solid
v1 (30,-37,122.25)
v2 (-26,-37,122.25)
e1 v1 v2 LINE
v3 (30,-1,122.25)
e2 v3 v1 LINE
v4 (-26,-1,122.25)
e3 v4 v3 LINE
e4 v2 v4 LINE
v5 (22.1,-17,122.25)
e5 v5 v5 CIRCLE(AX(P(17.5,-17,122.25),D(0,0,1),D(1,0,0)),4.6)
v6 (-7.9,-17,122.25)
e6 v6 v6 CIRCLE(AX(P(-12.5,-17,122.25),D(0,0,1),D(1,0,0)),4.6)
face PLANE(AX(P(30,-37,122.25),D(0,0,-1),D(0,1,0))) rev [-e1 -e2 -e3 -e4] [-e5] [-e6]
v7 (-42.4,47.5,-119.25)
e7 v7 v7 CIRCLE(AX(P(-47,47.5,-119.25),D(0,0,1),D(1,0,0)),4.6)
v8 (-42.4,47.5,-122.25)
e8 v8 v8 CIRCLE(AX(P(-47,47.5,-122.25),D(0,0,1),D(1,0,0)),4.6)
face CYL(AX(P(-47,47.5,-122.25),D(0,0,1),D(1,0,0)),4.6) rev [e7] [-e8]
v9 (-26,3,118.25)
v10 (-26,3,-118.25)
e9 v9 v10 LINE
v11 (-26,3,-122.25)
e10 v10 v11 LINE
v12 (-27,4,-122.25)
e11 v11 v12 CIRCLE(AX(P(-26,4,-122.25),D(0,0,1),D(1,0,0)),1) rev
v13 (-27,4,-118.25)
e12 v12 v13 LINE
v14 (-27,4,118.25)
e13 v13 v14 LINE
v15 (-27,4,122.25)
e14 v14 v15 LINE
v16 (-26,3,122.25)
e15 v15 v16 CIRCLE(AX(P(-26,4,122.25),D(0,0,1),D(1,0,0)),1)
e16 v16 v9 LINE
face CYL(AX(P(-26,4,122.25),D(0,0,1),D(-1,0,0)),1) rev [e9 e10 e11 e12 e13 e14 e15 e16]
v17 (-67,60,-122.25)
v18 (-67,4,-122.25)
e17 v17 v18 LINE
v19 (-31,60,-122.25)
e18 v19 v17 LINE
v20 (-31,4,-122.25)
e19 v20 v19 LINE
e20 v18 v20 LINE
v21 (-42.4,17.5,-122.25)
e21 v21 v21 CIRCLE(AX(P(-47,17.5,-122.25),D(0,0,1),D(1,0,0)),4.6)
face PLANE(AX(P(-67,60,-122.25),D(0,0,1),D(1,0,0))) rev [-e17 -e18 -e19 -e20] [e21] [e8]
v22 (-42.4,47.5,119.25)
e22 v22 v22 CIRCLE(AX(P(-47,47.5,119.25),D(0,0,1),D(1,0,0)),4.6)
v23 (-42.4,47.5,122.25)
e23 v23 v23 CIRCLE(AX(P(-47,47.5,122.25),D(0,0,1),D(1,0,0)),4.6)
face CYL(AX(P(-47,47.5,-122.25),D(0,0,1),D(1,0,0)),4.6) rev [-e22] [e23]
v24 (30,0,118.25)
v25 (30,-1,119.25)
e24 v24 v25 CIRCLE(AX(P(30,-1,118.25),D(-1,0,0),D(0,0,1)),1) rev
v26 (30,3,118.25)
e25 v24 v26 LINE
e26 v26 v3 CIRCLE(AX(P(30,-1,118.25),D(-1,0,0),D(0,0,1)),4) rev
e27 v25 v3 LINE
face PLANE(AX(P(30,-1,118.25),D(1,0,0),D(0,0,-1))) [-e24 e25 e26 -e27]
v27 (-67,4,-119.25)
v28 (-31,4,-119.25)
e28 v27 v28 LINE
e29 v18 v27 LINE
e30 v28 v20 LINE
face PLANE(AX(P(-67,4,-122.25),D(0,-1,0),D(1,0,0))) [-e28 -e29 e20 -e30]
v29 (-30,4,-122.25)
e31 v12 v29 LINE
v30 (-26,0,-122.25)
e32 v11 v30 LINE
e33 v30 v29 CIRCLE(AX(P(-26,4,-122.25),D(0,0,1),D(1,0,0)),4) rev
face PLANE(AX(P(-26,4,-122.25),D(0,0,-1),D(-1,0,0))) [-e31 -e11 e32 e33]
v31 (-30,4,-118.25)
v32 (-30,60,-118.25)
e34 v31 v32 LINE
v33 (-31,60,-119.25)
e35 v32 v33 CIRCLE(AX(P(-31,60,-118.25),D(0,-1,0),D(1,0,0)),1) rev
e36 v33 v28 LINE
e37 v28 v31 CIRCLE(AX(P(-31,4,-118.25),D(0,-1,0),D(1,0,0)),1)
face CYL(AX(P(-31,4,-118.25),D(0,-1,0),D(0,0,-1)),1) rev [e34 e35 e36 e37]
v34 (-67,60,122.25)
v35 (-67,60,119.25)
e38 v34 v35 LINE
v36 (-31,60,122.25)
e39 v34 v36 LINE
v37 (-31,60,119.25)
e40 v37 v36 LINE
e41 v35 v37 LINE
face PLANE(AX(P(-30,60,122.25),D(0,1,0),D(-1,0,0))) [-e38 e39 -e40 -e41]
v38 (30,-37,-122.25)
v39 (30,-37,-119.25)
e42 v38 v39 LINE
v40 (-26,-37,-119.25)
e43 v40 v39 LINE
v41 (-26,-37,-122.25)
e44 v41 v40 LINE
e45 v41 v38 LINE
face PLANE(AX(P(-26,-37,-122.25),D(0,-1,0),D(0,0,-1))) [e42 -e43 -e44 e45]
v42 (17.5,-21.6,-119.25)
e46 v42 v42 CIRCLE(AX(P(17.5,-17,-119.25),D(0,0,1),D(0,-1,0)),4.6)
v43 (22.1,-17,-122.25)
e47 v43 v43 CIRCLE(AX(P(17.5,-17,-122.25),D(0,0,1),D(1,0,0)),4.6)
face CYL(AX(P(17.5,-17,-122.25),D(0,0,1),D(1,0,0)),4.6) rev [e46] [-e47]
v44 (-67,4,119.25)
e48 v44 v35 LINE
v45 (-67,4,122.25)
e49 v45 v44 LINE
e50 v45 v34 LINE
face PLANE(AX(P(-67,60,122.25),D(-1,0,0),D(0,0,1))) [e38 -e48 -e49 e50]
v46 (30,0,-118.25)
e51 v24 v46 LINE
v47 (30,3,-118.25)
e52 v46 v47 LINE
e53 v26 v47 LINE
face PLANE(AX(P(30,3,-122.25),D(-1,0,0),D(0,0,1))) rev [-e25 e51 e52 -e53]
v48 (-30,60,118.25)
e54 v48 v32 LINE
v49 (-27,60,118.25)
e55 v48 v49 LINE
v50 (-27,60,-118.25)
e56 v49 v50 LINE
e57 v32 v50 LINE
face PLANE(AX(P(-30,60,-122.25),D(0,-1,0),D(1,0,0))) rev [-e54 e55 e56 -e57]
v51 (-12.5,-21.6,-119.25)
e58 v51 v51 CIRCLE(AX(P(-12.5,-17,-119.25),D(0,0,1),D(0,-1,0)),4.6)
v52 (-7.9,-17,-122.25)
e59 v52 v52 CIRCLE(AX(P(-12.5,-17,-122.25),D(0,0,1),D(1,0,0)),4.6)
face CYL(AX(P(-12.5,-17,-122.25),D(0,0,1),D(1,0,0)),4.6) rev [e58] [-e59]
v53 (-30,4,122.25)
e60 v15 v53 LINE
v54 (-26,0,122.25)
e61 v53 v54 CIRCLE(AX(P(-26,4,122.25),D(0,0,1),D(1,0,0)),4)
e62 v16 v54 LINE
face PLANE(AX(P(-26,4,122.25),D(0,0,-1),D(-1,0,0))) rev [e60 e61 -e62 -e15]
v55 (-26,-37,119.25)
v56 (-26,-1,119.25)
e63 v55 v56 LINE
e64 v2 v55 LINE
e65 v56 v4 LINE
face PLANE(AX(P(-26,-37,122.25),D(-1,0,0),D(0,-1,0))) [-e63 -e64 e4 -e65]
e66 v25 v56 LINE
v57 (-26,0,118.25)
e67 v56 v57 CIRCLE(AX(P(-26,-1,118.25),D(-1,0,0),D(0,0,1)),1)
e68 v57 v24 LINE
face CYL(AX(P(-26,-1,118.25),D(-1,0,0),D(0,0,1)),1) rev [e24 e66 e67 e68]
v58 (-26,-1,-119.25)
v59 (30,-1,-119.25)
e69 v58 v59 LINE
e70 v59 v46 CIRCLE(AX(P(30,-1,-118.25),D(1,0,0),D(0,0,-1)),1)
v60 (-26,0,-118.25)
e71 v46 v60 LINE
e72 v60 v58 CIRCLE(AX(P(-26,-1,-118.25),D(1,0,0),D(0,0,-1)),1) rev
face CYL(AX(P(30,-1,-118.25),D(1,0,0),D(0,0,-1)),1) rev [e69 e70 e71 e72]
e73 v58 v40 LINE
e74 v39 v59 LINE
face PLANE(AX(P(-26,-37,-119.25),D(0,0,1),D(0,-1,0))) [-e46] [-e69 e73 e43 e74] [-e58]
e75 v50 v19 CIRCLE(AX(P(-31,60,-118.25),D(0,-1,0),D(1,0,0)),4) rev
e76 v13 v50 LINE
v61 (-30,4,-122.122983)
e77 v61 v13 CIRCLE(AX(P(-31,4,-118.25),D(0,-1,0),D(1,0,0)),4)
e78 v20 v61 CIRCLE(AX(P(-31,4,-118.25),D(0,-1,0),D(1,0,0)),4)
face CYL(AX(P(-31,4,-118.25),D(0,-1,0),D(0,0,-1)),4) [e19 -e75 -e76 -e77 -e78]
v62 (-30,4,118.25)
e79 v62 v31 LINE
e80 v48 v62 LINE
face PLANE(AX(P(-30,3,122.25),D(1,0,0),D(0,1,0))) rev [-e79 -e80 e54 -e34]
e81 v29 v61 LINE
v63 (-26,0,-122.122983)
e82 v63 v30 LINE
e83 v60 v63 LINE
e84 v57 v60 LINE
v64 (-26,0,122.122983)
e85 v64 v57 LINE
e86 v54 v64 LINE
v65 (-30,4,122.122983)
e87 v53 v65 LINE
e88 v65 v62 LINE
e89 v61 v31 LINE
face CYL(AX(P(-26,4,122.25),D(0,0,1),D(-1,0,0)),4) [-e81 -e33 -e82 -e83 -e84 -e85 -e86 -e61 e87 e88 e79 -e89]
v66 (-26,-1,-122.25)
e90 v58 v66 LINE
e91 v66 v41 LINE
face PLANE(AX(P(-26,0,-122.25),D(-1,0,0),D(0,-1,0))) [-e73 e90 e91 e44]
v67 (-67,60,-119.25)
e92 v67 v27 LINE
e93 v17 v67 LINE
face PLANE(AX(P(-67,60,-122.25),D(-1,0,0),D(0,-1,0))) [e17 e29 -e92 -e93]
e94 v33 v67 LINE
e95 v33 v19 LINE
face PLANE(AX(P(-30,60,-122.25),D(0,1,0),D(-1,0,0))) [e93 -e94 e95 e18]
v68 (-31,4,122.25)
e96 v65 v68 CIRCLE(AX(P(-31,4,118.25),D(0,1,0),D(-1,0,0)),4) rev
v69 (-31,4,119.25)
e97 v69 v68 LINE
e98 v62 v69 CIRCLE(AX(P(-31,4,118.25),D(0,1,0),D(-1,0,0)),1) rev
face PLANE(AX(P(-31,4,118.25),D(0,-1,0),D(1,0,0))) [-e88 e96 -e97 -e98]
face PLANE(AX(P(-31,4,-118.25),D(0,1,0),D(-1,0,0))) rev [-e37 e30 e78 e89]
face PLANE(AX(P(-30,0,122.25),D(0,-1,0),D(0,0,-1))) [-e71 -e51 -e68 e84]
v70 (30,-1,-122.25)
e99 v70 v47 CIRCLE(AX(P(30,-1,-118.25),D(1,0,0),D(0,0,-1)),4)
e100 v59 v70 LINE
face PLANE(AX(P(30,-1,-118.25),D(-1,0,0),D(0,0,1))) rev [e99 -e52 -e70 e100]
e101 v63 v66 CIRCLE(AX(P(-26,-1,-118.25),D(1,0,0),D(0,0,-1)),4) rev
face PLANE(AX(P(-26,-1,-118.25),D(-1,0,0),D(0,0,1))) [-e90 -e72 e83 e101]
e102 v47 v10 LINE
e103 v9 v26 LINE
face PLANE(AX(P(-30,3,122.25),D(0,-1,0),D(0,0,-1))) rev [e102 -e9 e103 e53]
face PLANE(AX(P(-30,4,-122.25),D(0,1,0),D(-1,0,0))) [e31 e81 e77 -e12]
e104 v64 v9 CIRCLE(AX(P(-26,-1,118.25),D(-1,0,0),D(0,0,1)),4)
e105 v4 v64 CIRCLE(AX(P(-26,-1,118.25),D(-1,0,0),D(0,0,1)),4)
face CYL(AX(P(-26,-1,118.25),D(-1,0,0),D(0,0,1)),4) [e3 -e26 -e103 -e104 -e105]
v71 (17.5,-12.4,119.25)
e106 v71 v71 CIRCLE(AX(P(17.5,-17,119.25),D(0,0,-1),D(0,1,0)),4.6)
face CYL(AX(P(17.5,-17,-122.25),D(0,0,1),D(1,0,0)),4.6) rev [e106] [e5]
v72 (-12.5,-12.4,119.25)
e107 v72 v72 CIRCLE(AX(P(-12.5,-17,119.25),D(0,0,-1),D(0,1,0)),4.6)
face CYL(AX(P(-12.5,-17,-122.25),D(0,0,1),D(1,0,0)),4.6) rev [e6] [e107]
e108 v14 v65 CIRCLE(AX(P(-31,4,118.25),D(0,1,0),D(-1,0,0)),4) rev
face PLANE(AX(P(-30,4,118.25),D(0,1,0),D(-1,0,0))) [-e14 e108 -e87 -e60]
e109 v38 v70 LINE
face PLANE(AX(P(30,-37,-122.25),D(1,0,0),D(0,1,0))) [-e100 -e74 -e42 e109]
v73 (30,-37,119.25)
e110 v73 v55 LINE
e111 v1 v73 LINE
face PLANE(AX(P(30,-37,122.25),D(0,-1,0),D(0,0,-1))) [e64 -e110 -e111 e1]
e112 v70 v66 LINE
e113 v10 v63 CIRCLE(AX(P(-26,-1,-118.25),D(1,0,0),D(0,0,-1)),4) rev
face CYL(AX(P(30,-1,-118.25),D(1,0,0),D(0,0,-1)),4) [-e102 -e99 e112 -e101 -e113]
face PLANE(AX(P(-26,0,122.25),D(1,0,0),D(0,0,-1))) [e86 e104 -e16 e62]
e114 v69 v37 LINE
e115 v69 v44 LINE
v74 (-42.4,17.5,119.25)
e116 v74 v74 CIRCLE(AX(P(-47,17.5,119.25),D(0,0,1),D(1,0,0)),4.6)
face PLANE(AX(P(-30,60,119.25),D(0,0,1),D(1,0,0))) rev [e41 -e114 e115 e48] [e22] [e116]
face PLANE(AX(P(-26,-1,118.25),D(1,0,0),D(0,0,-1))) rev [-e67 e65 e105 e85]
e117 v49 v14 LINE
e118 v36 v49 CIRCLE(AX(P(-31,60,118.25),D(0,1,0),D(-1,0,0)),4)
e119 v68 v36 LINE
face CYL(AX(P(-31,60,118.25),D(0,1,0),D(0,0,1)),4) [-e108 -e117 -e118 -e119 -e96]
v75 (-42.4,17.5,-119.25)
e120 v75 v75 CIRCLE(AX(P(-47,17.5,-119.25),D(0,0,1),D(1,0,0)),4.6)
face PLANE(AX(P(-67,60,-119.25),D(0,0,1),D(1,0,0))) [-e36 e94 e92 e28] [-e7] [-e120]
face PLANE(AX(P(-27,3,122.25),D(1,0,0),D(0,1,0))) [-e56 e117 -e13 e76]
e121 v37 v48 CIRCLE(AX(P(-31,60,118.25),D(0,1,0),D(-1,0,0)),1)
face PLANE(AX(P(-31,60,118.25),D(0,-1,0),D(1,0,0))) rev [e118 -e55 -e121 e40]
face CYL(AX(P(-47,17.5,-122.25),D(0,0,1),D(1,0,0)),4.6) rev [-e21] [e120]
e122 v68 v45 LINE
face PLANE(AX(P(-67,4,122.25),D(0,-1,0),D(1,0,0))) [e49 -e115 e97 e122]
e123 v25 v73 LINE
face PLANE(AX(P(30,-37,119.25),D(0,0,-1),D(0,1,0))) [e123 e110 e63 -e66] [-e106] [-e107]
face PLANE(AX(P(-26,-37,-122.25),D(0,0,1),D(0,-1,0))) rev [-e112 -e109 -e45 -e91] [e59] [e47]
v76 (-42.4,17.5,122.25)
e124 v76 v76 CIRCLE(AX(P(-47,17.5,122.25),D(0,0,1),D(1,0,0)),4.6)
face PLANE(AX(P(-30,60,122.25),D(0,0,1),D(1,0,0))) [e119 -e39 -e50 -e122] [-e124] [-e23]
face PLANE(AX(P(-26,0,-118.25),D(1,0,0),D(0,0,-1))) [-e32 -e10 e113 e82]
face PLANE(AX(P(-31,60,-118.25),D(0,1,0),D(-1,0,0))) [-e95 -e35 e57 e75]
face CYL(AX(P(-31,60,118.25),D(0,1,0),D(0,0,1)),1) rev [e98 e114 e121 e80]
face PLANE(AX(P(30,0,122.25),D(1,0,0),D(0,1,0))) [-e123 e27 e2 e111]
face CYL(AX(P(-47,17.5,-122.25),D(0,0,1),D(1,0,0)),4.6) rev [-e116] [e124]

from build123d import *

# Parameters (mm, degrees)
SKETCH1_W                      = 60
SKETCH1_H                      = 244.5
BASE_FLANGE1_DEPTH             = 3
EDGE_FLANGE1_STRIP_W           = 14
EDGE_FLANGE1_STRIP_H           = 3
EDGE_FLANGE1_STRIP_CUT_DEPTH   = 244.5
EDGE_FLANGE1_DEPTH             = 244.5
EDGE_FLANGE2_STRIP_W           = 14
EDGE_FLANGE2_STRIP_H           = 3
EDGE_FLANGE2_STRIP_CUT_DEPTH   = 56
EDGE_FLANGE2_STRIP_2_W         = 14
EDGE_FLANGE2_STRIP_2_H         = 3
EDGE_FLANGE2_STRIP_CUT_2_DEPTH = 56
EDGE_FLANGE2_STRIP_3_W         = 14
EDGE_FLANGE2_STRIP_3_H         = 3
EDGE_FLANGE2_STRIP_CUT_3_DEPTH = 56
EDGE_FLANGE2_STRIP_4_W         = 14
EDGE_FLANGE2_STRIP_4_H         = 3
EDGE_FLANGE2_STRIP_CUT_4_DEPTH = 56
EDGE_FLANGE2_DEPTH             = 56
EDGE_FLANGE2_BEND_DEPTH        = 56
EDGE_FLANGE2_BEND_2_DEPTH      = 56
EDGE_FLANGE2_BEND_3_DEPTH      = 56
SKETCH18_R                     = 4.6
EXTRUDE1_DEPTH                 = 261.517273899


# Sheet-metal steps are written as plain solids
with BuildPart() as part:
    # Sketch1 → Base-Flange1 (new body)
    with BuildSketch(Plane(origin=(0, 0, 0), x_dir=(1, 0, 0), z_dir=(0, 1, 0))):
        Rectangle(SKETCH1_W, SKETCH1_H)
    extrude(amount=BASE_FLANGE1_DEPTH)

    # Edge-Flange1 strip (across the edge) → Edge-Flange1 strip cut (cut)
    with BuildSketch(Plane(origin=(-30, 3, -122.25), x_dir=(1, 0, 0), z_dir=(0, 0, 1))):
        with Locations((-3, -1.5)):
            Rectangle(EDGE_FLANGE1_STRIP_W, EDGE_FLANGE1_STRIP_H)
    extrude(amount=EDGE_FLANGE1_STRIP_CUT_DEPTH, mode=Mode.SUBTRACT)

    # Edge-Flange1 section (across the edge) → Edge-Flange1 (add)
    with BuildSketch(Plane(origin=(-30, 3, -122.25), x_dir=(1, 0, 0), z_dir=(0, 0, 1))):
        with BuildLine():
            Line((0, 1), (0, 57))
            Line((0, 57), (3, 57))
            Line((3, 57), (3, 1))
            ThreePointArc((3, 1), (3.292893219, 0.292893219), (4, 0))
            Line((4, 0), (4, -3))
            ThreePointArc((4, -3), (1.171572875, -1.828427125), (0, 1))
        make_face()
    extrude(amount=EDGE_FLANGE1_DEPTH)

    # Edge-Flange2 strip (across the edge) → Edge-Flange2 strip cut (cut)
    with BuildSketch(Plane(origin=(-30, 4, 122.25), x_dir=(0, 0, -1), z_dir=(0, 1, 0))):
        with Locations((-3, -1.5)):
            Rectangle(EDGE_FLANGE2_STRIP_W, EDGE_FLANGE2_STRIP_H)
    extrude(amount=EDGE_FLANGE2_STRIP_CUT_DEPTH, mode=Mode.SUBTRACT)

    # Edge-Flange2 strip 2 (across the edge) → Edge-Flange2 strip cut 2 (cut)
    with BuildSketch(Plane(origin=(30, 0, 122.25), x_dir=(0, 0, -1), z_dir=(-1, 0, 0))):
        with Locations((-3, -1.5)):
            Rectangle(EDGE_FLANGE2_STRIP_2_W, EDGE_FLANGE2_STRIP_2_H)
    extrude(amount=EDGE_FLANGE2_STRIP_CUT_2_DEPTH, mode=Mode.SUBTRACT)

    # Edge-Flange2 strip 3 (across the edge) → Edge-Flange2 strip cut 3 (cut)
    with BuildSketch(Plane(origin=(-30, 60, -122.25), x_dir=(0, 0, 1), z_dir=(0, -1, 0))):
        with Locations((-3, -1.5)):
            Rectangle(EDGE_FLANGE2_STRIP_3_W, EDGE_FLANGE2_STRIP_3_H)
    extrude(amount=EDGE_FLANGE2_STRIP_CUT_3_DEPTH, mode=Mode.SUBTRACT)

    # Edge-Flange2 strip 4 (across the edge) → Edge-Flange2 strip cut 4 (cut)
    with BuildSketch(Plane(origin=(-26, 0, -122.25), x_dir=(0, 0, 1), z_dir=(1, 0, 0))):
        with Locations((-3, -1.5)):
            Rectangle(EDGE_FLANGE2_STRIP_4_W, EDGE_FLANGE2_STRIP_4_H)
    extrude(amount=EDGE_FLANGE2_STRIP_CUT_4_DEPTH, mode=Mode.SUBTRACT)

    # Edge-Flange2 section (across the edge) → Edge-Flange2 (add)
    with BuildSketch(Plane(origin=(-30, 4, 122.25), x_dir=(0, 0, -1), z_dir=(0, 1, 0))):
        with BuildLine():
            Line((0, 1), (0, 37))
            Line((0, 37), (3, 37))
            Line((3, 37), (3, 1))
            ThreePointArc((3, 1), (3.292893219, 0.292893219), (4, 0))
            Line((4, 0), (4, -3))
            ThreePointArc((4, -3), (1.171572875, -1.828427125), (0, 1))
        make_face()
    extrude(amount=EDGE_FLANGE2_DEPTH)

    # Edge-Flange2 section 2 (across the edge) → Edge-Flange2 bend (add)
    with BuildSketch(Plane(origin=(30, 0, 122.25), x_dir=(0, 0, -1), z_dir=(-1, 0, 0))):
        with BuildLine():
            Line((0, 1), (0, 37))
            Line((0, 37), (3, 37))
            Line((3, 37), (3, 1))
            ThreePointArc((3, 1), (3.292893219, 0.292893219), (4, 0))
            Line((4, 0), (4, -3))
            ThreePointArc((4, -3), (1.171572875, -1.828427125), (0, 1))
        make_face()
    extrude(amount=EDGE_FLANGE2_BEND_DEPTH)

    # Edge-Flange2 section 3 (across the edge) → Edge-Flange2 bend 2 (add)
    with BuildSketch(Plane(origin=(-30, 60, -122.25), x_dir=(0, 0, 1), z_dir=(0, -1, 0))):
        with BuildLine():
            Line((0, 1), (0, 37))
            Line((0, 37), (3, 37))
            Line((3, 37), (3, 1))
            ThreePointArc((3, 1), (3.292893219, 0.292893219), (4, 0))
            Line((4, 0), (4, -3))
            ThreePointArc((4, -3), (1.171572875, -1.828427125), (0, 1))
        make_face()
    extrude(amount=EDGE_FLANGE2_BEND_2_DEPTH)

    # Edge-Flange2 section 4 (across the edge) → Edge-Flange2 bend 3 (add)
    with BuildSketch(Plane(origin=(-26, 0, -122.25), x_dir=(0, 0, 1), z_dir=(1, 0, 0))):
        with BuildLine():
            Line((0, 1), (0, 37))
            Line((0, 37), (3, 37))
            Line((3, 37), (3, 1))
            ThreePointArc((3, 1), (3.292893219, 0.292893219), (4, 0))
            Line((4, 0), (4, -3))
            ThreePointArc((4, -3), (1.171572875, -1.828427125), (0, 1))
        make_face()
    extrude(amount=EDGE_FLANGE2_BEND_3_DEPTH)

    # Sketch18 → Extrude1 (cut, through all)
    with BuildSketch(Plane.XY.offset(122.25)):
        with Locations((-47, 47.5)):
            Circle(SKETCH18_R)
        with Locations((-47, 17.5)):
            Circle(SKETCH18_R)
        with Locations((-12.5, -17)):
            Circle(SKETCH18_R)
        with Locations((17.5, -17)):
            Circle(SKETCH18_R)
    extrude(amount=-EXTRUDE1_DEPTH, mode=Mode.SUBTRACT)


solid = part.part
